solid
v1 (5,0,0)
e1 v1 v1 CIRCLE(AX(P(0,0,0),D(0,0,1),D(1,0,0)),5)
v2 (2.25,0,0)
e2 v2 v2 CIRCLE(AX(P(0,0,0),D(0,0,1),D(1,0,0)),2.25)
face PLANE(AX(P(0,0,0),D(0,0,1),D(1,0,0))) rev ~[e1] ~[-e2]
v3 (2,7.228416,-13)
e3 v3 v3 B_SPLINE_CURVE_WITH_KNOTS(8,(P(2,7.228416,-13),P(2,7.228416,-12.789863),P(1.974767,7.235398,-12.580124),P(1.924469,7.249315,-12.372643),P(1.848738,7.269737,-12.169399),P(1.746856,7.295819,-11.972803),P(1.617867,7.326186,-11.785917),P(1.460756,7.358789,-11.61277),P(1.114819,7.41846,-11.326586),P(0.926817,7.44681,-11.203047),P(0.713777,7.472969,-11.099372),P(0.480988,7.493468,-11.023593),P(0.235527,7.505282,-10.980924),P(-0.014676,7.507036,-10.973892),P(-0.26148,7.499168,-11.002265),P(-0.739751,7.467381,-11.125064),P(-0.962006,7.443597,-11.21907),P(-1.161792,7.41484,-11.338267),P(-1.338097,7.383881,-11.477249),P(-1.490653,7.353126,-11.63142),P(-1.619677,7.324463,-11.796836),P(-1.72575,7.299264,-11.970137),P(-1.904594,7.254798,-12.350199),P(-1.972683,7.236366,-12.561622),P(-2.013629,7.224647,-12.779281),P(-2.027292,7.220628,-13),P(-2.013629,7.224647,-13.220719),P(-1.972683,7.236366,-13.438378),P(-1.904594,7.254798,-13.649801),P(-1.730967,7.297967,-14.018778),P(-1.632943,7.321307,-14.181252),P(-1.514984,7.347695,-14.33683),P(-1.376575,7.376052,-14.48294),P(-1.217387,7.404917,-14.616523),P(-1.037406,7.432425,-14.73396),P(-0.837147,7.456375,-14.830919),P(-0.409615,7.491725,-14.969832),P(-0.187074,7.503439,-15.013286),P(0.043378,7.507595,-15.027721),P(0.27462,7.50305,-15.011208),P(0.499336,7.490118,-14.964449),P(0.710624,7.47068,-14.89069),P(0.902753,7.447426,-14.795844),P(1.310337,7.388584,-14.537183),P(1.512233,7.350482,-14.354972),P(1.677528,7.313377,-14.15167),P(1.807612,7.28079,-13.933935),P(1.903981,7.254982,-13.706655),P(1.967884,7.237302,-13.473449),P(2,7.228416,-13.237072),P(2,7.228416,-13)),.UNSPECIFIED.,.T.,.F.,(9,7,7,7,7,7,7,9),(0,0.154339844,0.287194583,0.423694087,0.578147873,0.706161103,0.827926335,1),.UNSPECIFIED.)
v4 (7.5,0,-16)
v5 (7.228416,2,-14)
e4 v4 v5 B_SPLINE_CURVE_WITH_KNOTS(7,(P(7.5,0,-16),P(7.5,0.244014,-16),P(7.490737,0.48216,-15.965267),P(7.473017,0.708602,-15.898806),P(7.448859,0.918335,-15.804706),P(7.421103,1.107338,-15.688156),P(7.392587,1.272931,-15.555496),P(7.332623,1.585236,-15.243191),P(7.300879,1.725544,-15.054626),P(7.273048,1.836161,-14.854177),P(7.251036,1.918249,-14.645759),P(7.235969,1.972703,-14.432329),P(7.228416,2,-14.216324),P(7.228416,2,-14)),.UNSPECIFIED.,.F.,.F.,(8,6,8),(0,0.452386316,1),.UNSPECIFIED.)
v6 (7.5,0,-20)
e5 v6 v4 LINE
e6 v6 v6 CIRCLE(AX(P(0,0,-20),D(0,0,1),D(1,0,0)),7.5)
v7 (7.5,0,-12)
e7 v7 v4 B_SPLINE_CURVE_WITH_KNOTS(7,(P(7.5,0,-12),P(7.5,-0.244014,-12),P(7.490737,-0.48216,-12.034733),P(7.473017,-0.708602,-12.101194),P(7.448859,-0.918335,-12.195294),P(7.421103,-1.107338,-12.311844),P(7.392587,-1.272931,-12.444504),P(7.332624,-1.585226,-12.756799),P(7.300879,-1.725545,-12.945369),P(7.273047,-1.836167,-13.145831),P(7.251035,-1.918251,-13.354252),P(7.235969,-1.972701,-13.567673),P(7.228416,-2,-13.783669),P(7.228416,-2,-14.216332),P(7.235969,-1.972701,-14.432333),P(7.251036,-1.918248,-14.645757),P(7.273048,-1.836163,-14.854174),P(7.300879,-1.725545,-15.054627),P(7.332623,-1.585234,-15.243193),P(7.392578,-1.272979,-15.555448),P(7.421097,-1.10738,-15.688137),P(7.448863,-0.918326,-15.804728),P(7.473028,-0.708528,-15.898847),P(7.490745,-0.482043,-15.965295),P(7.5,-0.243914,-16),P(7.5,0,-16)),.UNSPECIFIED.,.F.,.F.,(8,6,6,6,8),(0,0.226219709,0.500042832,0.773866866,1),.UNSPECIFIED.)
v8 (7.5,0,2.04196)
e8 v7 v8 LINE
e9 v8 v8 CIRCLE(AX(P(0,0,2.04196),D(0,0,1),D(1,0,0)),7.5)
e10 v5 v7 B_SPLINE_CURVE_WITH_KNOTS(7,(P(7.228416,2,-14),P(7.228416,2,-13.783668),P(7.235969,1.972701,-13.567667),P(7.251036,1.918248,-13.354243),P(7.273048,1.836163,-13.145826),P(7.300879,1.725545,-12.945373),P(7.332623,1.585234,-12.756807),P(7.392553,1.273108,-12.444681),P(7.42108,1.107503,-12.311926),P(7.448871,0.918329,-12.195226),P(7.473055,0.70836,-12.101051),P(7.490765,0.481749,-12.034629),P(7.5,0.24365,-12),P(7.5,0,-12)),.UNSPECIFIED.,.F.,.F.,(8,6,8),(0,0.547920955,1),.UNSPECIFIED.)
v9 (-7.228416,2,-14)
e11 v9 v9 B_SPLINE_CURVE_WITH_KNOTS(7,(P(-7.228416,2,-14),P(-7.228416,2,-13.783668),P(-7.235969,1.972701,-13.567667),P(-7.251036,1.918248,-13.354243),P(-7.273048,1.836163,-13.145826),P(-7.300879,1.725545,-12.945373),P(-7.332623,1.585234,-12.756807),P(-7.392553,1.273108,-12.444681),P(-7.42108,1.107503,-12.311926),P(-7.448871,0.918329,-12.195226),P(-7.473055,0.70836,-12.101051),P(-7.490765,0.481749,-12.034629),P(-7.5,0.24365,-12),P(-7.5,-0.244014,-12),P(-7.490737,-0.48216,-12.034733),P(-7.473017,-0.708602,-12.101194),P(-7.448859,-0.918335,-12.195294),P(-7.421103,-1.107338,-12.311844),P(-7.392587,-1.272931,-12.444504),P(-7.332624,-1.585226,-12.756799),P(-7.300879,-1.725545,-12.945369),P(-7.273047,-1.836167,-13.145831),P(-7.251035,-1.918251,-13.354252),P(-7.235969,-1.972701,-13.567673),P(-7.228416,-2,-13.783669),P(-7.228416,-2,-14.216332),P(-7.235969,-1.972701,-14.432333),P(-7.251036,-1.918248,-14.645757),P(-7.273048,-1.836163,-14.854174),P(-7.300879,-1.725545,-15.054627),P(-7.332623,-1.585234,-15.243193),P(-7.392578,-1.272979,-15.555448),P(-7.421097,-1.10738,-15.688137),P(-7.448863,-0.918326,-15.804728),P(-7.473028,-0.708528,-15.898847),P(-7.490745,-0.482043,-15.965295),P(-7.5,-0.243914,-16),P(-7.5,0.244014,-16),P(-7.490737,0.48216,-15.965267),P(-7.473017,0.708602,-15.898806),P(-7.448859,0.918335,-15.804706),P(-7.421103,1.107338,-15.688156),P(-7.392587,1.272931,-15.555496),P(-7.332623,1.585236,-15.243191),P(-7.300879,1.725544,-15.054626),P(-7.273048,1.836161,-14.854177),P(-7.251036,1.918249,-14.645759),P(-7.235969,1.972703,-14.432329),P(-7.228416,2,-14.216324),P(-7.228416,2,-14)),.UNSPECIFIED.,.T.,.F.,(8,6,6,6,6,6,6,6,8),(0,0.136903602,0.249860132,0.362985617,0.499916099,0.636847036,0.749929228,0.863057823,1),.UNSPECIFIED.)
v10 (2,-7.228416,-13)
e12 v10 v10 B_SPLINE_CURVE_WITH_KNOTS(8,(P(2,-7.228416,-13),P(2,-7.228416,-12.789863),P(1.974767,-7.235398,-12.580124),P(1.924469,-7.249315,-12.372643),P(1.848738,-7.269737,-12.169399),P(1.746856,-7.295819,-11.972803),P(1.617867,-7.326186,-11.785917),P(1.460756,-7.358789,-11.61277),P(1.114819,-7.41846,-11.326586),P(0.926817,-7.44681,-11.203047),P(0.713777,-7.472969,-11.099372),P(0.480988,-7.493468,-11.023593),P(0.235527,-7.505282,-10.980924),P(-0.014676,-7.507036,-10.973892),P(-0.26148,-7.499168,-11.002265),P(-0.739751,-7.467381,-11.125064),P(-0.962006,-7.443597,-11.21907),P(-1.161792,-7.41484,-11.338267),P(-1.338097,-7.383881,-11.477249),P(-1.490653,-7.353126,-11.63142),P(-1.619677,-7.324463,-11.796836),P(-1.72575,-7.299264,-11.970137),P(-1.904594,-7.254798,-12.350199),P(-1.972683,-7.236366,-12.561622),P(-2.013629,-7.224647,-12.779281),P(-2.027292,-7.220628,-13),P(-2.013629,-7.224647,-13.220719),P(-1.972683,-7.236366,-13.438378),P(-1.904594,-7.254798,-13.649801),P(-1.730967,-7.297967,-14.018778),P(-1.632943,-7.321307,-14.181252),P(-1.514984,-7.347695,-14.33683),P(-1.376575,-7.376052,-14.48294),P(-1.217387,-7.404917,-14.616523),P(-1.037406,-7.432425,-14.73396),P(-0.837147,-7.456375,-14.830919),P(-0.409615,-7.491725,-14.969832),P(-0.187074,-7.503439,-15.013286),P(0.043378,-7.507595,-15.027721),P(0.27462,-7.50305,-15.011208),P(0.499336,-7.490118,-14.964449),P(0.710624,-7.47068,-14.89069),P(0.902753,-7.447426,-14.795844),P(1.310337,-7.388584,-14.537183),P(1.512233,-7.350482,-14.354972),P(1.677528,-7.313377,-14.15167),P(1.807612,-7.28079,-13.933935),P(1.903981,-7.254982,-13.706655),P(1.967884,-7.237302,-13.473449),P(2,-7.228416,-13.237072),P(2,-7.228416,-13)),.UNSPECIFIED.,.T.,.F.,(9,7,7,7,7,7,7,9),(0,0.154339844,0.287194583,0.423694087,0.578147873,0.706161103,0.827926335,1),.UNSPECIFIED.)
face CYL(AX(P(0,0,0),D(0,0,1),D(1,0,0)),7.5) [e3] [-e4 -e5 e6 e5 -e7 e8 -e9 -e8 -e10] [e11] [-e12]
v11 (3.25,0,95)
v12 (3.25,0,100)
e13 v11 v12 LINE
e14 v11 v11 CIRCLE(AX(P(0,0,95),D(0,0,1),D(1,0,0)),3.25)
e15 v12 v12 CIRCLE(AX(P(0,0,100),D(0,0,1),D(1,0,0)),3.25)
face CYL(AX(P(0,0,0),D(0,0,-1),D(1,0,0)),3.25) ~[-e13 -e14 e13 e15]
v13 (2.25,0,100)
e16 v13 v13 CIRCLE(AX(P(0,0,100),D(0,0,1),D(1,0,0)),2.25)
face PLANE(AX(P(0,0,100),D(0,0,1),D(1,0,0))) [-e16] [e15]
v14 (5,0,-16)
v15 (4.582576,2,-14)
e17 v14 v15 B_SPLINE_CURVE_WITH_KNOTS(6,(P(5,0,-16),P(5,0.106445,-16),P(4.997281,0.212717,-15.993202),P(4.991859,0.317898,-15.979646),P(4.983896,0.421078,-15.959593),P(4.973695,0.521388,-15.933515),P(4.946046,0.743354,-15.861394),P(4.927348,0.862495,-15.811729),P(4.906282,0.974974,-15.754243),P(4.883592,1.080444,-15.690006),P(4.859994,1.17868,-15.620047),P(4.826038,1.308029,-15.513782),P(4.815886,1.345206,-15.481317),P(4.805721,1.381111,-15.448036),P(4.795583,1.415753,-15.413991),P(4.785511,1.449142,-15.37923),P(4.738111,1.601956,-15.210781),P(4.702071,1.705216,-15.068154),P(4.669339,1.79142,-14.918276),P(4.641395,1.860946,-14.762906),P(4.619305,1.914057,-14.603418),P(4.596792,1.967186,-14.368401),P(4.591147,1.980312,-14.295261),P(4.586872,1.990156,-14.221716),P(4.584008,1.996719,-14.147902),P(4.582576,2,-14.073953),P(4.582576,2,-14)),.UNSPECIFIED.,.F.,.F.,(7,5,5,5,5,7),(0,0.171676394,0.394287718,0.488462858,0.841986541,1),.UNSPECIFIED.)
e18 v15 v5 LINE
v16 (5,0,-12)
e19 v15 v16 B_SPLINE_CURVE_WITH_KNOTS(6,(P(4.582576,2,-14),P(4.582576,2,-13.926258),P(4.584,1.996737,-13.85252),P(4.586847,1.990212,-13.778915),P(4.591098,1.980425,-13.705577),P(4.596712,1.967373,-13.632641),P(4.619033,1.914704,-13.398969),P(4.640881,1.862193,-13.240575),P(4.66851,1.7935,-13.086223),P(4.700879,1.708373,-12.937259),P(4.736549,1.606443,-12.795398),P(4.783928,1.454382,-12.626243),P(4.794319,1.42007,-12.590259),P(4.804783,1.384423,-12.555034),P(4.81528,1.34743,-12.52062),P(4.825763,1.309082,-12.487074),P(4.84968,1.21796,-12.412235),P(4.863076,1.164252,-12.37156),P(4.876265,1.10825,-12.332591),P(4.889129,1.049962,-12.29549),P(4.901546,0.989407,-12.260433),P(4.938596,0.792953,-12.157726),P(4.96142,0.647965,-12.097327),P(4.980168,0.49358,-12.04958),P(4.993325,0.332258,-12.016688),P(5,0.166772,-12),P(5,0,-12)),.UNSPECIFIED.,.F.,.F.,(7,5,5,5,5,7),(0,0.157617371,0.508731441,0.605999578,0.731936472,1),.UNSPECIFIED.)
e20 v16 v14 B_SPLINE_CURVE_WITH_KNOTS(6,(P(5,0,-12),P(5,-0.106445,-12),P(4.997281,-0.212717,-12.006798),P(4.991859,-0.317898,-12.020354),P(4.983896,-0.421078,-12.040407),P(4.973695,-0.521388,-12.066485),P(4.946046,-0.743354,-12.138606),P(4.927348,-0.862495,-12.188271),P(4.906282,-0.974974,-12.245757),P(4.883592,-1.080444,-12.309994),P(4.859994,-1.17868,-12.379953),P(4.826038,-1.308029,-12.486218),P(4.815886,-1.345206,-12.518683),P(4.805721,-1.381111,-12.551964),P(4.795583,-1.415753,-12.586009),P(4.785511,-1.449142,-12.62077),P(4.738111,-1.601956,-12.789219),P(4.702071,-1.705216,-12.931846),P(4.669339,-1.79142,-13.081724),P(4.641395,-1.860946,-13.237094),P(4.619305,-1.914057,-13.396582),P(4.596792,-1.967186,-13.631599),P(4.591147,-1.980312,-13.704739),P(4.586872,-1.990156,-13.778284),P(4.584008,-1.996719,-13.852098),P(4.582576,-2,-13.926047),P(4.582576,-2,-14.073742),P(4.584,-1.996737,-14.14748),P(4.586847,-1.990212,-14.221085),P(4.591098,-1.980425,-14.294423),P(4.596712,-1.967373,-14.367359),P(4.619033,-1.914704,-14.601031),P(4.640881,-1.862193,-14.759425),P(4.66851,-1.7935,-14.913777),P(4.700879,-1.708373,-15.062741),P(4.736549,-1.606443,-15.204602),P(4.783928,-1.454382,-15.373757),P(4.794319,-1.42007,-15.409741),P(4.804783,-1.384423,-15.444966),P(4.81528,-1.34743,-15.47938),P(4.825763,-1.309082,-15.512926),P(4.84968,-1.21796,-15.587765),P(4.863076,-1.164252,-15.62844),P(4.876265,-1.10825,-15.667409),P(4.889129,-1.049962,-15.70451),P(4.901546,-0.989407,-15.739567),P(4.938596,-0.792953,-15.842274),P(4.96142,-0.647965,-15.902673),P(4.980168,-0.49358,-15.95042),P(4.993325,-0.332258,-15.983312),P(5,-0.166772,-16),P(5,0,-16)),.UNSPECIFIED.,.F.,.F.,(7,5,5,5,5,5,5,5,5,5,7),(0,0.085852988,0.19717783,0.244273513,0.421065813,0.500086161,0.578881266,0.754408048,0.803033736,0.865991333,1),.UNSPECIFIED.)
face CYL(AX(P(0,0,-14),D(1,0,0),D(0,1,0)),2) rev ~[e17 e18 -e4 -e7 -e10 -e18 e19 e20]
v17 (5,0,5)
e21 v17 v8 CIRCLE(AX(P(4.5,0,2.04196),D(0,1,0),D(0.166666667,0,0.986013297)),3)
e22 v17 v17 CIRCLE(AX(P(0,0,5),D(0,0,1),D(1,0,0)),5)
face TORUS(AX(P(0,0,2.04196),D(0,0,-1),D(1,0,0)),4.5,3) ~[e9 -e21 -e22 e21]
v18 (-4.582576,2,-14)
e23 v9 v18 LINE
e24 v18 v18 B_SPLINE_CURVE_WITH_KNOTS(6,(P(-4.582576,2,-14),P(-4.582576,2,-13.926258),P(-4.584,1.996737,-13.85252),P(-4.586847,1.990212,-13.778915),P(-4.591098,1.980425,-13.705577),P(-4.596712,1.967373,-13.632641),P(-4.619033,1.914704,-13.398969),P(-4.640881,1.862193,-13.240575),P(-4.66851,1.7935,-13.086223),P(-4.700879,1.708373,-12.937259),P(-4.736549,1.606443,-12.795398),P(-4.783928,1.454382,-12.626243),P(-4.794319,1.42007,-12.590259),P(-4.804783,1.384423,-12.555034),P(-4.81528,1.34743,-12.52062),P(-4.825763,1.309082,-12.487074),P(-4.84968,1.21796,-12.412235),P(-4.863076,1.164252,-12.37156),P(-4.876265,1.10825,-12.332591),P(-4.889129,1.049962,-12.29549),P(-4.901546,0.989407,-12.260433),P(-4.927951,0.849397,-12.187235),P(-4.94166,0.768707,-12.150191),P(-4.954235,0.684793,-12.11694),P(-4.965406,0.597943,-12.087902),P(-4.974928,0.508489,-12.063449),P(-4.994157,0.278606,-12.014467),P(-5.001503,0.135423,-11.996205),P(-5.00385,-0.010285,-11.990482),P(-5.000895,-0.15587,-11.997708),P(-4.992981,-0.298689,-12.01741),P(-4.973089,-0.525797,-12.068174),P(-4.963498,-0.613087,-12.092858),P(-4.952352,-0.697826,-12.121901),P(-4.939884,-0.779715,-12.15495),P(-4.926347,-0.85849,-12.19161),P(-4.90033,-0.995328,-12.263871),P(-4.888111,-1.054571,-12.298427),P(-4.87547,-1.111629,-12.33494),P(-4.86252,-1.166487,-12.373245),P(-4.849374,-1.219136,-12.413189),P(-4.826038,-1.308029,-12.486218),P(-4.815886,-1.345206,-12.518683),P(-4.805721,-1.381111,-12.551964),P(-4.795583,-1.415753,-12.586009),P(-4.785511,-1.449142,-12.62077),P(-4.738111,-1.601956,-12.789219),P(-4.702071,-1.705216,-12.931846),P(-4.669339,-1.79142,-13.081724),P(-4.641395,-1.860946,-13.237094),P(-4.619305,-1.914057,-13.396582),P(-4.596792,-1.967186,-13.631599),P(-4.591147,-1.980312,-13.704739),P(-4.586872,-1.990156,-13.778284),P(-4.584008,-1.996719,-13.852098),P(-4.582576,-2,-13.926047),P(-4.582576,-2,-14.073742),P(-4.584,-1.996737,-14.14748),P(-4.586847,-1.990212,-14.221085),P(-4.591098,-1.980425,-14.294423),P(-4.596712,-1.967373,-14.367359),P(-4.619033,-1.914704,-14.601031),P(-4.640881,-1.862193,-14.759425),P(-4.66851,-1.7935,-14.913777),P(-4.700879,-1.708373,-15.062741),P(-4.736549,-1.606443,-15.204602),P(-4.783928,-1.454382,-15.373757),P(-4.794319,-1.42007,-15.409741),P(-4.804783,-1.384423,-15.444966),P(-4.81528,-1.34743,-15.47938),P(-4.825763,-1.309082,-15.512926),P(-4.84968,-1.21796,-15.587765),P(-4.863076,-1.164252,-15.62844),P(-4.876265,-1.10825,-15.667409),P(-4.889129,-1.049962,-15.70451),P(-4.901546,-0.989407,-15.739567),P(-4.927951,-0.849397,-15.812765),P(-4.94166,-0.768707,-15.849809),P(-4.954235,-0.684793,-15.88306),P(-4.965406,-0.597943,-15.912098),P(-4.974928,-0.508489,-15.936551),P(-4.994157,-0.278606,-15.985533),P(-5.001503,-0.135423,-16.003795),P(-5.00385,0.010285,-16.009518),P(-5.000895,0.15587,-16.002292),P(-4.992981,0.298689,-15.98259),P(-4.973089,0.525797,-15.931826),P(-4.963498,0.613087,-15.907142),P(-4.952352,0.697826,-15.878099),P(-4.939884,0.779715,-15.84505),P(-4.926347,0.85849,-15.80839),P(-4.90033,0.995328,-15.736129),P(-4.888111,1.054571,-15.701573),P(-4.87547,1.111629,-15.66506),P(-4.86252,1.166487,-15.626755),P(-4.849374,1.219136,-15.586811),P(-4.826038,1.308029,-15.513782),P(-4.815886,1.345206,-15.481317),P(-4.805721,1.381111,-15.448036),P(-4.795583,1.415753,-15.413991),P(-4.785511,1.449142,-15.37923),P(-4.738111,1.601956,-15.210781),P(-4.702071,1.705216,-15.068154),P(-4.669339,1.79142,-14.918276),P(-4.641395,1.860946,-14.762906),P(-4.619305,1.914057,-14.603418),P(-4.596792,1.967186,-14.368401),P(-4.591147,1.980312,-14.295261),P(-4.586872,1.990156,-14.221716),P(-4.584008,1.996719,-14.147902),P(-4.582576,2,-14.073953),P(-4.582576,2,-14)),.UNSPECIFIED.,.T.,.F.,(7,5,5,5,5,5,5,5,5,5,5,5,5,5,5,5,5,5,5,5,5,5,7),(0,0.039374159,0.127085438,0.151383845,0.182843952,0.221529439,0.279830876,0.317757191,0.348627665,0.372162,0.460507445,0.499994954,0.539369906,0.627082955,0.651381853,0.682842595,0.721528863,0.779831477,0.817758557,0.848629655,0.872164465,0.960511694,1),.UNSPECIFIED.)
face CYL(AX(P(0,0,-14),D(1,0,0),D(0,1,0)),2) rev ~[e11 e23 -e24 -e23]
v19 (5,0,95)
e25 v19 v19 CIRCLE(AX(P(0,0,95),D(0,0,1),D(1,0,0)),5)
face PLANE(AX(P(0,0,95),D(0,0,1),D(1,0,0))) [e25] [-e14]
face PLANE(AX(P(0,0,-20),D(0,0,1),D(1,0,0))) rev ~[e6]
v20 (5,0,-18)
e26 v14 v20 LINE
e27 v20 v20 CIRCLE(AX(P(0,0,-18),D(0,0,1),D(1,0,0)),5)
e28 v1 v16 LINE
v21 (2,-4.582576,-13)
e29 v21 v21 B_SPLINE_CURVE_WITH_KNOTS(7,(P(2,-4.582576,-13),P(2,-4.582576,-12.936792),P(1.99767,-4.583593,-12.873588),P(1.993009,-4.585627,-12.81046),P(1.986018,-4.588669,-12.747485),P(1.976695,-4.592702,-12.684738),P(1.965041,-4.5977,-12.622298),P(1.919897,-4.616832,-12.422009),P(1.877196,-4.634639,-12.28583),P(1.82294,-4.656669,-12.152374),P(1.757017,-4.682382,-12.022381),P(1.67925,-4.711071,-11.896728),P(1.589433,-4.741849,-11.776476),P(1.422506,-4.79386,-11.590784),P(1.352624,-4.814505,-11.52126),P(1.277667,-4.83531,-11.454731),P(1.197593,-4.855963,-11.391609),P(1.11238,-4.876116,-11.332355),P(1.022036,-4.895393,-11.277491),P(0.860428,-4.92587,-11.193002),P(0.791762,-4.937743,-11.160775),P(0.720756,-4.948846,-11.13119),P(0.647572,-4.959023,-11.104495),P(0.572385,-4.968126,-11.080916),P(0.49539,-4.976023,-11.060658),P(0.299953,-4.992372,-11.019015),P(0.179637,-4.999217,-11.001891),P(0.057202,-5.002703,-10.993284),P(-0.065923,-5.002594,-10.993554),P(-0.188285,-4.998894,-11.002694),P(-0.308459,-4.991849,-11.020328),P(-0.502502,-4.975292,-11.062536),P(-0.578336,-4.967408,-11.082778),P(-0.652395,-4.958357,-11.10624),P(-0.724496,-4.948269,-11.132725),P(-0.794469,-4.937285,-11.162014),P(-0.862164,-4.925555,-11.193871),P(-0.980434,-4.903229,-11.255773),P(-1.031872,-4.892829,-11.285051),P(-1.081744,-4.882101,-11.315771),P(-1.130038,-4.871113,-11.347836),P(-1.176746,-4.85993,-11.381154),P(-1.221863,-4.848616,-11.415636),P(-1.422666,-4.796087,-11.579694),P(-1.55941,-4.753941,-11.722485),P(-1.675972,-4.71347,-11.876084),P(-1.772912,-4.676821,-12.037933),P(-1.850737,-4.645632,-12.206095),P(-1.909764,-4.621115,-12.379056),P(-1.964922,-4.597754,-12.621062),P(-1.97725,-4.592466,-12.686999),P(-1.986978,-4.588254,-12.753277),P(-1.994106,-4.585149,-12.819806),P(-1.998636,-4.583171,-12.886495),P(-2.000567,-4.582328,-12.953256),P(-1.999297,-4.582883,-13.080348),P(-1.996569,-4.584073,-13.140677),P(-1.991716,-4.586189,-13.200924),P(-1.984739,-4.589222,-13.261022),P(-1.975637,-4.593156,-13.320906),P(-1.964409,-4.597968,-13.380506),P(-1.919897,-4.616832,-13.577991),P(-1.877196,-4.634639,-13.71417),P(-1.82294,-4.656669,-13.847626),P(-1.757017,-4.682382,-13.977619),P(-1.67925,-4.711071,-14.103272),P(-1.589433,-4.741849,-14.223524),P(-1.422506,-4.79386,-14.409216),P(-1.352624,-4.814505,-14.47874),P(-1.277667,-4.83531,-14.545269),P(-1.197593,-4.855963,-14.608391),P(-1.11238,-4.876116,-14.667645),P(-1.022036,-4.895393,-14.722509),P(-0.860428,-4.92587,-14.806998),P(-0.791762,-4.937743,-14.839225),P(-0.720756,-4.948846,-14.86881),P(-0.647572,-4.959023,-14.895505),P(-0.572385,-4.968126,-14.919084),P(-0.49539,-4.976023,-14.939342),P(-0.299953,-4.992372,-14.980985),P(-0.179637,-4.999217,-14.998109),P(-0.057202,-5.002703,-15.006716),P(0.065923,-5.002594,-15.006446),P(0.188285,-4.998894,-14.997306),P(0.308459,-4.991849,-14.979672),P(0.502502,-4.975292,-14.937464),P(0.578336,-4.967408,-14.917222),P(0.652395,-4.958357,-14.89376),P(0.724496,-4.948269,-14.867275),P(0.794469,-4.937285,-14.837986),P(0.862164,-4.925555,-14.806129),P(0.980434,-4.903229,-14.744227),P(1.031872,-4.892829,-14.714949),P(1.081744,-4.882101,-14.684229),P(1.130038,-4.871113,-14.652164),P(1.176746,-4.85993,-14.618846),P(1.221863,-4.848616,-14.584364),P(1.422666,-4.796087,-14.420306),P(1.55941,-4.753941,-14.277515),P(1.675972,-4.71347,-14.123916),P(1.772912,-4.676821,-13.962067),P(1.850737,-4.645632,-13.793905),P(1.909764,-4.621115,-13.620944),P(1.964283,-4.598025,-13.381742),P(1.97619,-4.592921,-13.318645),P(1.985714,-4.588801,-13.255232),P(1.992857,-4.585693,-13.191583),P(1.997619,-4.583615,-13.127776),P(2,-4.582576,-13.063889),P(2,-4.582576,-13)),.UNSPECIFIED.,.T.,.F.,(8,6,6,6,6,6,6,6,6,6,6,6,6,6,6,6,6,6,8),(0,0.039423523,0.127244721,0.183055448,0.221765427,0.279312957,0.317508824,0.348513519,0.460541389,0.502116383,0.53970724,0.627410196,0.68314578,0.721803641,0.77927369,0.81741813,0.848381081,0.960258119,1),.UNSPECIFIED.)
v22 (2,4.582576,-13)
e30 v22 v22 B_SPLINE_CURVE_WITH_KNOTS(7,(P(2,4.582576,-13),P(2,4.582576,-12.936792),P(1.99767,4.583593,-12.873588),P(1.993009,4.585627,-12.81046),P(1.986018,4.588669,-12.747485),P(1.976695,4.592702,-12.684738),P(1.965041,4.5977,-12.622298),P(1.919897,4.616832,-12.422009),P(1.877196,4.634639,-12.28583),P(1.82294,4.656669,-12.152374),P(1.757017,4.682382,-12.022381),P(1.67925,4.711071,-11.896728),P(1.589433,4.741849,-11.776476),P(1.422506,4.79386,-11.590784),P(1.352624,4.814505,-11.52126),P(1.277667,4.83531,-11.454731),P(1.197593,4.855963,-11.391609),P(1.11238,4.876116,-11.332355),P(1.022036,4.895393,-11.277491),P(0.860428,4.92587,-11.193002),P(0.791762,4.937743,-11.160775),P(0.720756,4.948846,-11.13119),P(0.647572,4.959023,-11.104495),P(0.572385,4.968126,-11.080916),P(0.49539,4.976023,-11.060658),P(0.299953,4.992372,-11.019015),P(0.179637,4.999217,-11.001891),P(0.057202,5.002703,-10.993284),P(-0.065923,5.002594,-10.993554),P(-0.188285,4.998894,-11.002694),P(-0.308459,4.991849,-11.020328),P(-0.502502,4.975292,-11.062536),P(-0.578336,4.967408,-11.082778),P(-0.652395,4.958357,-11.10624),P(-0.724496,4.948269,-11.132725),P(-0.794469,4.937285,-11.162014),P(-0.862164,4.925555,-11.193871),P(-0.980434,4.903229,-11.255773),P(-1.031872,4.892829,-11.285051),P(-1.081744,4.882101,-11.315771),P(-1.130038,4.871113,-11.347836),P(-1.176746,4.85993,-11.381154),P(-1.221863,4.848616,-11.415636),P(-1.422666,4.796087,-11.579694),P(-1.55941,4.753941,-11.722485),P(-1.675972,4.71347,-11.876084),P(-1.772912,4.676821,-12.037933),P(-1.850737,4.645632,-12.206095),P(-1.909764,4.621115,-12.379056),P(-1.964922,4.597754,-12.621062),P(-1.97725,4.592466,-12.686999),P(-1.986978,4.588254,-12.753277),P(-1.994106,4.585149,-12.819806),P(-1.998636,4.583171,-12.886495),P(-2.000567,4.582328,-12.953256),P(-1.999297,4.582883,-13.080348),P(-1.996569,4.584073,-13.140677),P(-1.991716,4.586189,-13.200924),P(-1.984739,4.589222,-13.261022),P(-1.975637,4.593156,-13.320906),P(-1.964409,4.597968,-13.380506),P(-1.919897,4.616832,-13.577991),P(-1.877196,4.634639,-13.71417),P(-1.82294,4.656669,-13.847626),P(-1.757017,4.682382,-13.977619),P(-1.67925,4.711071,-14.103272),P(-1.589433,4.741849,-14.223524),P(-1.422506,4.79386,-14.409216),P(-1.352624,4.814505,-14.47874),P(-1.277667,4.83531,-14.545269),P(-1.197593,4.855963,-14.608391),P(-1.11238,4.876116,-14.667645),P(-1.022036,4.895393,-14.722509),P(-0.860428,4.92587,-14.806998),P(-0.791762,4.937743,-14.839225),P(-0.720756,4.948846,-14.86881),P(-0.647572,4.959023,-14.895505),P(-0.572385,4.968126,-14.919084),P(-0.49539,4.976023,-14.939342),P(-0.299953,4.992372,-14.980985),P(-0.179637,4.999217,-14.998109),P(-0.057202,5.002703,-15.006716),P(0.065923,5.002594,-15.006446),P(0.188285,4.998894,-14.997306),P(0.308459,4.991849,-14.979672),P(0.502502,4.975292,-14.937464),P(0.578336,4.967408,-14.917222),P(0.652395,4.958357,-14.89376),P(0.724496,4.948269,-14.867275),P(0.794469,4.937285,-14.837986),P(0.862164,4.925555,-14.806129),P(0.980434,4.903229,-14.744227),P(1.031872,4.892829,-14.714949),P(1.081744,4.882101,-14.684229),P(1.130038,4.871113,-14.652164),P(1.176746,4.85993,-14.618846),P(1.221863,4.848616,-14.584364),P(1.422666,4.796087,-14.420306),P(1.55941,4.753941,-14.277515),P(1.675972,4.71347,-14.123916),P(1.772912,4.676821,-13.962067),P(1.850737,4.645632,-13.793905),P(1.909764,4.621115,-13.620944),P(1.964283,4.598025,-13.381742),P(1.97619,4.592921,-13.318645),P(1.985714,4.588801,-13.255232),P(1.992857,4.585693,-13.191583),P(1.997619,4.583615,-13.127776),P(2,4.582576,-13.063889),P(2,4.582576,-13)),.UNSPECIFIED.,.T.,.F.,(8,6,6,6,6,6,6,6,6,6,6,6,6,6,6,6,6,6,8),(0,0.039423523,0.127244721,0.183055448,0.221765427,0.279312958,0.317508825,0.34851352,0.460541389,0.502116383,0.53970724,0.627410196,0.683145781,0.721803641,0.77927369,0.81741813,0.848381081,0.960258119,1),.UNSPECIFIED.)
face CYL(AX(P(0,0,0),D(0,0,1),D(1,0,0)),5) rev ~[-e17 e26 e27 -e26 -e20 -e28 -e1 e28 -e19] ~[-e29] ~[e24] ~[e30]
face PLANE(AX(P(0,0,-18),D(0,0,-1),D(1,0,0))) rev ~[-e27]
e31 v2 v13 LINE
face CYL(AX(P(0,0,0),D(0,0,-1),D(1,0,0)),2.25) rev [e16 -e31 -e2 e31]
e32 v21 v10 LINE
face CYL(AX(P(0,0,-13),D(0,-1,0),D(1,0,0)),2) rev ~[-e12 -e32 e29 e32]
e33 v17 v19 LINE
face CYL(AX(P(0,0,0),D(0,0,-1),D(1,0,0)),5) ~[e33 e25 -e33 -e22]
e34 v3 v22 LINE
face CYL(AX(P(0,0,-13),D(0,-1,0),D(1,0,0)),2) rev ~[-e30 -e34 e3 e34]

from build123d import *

# Parameters (mm, degrees)
F0_R      = 3.25
F0_R_2    = 2.25
F1_DEPTH  = 100
F0_R_3    = 5
F2_DEPTH  = 95
F0_R_4    = 7.5
F3_DEPTH  = 5
F4_DEPTH  = 20
F6_R      = 5.5
F7_DEPTH  = 2
F8_R      = 2
F9_DEPTH  = 12.5
F10_R     = 2
F11_DEPTH = 12.5


# Not quite as in the source:
# - a fillet or chamfer that OpenCascade refuses, or shapes differently, is made with other operations: its cross-section is extruded or revolved along the edge and cut away or added


with BuildPart() as f1:
    # F0 (on Top) → F1 (new body)
    with BuildSketch(Plane.XY):
        Circle(F0_R)
        Circle(F0_R_2, mode=Mode.SUBTRACT)
    extrude(amount=F1_DEPTH)

    # F0 (on Top) → F2 (join)
    with BuildSketch(Plane.XY):
        Circle(F0_R_3)
        Circle(F0_R, mode=Mode.SUBTRACT)
    extrude(amount=F2_DEPTH)

    # F0 (on Top) → F3 (join)
    with BuildSketch(Plane.XY):
        Circle(F0_R_4)
        Circle(F0_R_3, mode=Mode.SUBTRACT)
    extrude(amount=F3_DEPTH)

    # F0 (on Top) → F4 (join)
    with BuildSketch(Plane.XY):
        Circle(F0_R_4)
        Circle(F0_R_3, mode=Mode.SUBTRACT)
    extrude(amount=-F4_DEPTH)

    # F6 (on offset) → F7 (join)
    with BuildSketch(Plane(origin=(0, 0, -20), x_dir=(1, 0, 0), z_dir=(0, 0, -1))):
        Circle(F6_R)
    extrude(amount=-F7_DEPTH)

    # F8 (on Front) → F9 (cut, symmetric)
    with BuildSketch(Plane.XZ):
        with Locations((0, -13)):
            Circle(F8_R)
    extrude(amount=F9_DEPTH, both=True, mode=Mode.SUBTRACT)

    # F10 (on Right) → F11 (cut, symmetric)
    with BuildSketch(Plane.YZ):
        with Locations((0, -14)):
            Circle(F10_R)
    extrude(amount=F11_DEPTH, both=True, mode=Mode.SUBTRACT)

    # F12: fillet of radius 3 on 1 edges, made by hand

    # F12_s1 → F12_t2 (revolve, cut)
    with BuildSketch(Plane.XZ):
        with BuildLine():
            ThreePointArc((5, 5), (6.7912878475, 3.9784517816), (7.5, 2.0419601084))
            Line((7.5, 2.0419601084), (7.5, 5))
            Line((7.5, 5), (5, 5))
        make_face()
    revolve(axis=Axis((0, 0, 5), (0, 0, 1)), mode=Mode.SUBTRACT)


solid = f1.part
